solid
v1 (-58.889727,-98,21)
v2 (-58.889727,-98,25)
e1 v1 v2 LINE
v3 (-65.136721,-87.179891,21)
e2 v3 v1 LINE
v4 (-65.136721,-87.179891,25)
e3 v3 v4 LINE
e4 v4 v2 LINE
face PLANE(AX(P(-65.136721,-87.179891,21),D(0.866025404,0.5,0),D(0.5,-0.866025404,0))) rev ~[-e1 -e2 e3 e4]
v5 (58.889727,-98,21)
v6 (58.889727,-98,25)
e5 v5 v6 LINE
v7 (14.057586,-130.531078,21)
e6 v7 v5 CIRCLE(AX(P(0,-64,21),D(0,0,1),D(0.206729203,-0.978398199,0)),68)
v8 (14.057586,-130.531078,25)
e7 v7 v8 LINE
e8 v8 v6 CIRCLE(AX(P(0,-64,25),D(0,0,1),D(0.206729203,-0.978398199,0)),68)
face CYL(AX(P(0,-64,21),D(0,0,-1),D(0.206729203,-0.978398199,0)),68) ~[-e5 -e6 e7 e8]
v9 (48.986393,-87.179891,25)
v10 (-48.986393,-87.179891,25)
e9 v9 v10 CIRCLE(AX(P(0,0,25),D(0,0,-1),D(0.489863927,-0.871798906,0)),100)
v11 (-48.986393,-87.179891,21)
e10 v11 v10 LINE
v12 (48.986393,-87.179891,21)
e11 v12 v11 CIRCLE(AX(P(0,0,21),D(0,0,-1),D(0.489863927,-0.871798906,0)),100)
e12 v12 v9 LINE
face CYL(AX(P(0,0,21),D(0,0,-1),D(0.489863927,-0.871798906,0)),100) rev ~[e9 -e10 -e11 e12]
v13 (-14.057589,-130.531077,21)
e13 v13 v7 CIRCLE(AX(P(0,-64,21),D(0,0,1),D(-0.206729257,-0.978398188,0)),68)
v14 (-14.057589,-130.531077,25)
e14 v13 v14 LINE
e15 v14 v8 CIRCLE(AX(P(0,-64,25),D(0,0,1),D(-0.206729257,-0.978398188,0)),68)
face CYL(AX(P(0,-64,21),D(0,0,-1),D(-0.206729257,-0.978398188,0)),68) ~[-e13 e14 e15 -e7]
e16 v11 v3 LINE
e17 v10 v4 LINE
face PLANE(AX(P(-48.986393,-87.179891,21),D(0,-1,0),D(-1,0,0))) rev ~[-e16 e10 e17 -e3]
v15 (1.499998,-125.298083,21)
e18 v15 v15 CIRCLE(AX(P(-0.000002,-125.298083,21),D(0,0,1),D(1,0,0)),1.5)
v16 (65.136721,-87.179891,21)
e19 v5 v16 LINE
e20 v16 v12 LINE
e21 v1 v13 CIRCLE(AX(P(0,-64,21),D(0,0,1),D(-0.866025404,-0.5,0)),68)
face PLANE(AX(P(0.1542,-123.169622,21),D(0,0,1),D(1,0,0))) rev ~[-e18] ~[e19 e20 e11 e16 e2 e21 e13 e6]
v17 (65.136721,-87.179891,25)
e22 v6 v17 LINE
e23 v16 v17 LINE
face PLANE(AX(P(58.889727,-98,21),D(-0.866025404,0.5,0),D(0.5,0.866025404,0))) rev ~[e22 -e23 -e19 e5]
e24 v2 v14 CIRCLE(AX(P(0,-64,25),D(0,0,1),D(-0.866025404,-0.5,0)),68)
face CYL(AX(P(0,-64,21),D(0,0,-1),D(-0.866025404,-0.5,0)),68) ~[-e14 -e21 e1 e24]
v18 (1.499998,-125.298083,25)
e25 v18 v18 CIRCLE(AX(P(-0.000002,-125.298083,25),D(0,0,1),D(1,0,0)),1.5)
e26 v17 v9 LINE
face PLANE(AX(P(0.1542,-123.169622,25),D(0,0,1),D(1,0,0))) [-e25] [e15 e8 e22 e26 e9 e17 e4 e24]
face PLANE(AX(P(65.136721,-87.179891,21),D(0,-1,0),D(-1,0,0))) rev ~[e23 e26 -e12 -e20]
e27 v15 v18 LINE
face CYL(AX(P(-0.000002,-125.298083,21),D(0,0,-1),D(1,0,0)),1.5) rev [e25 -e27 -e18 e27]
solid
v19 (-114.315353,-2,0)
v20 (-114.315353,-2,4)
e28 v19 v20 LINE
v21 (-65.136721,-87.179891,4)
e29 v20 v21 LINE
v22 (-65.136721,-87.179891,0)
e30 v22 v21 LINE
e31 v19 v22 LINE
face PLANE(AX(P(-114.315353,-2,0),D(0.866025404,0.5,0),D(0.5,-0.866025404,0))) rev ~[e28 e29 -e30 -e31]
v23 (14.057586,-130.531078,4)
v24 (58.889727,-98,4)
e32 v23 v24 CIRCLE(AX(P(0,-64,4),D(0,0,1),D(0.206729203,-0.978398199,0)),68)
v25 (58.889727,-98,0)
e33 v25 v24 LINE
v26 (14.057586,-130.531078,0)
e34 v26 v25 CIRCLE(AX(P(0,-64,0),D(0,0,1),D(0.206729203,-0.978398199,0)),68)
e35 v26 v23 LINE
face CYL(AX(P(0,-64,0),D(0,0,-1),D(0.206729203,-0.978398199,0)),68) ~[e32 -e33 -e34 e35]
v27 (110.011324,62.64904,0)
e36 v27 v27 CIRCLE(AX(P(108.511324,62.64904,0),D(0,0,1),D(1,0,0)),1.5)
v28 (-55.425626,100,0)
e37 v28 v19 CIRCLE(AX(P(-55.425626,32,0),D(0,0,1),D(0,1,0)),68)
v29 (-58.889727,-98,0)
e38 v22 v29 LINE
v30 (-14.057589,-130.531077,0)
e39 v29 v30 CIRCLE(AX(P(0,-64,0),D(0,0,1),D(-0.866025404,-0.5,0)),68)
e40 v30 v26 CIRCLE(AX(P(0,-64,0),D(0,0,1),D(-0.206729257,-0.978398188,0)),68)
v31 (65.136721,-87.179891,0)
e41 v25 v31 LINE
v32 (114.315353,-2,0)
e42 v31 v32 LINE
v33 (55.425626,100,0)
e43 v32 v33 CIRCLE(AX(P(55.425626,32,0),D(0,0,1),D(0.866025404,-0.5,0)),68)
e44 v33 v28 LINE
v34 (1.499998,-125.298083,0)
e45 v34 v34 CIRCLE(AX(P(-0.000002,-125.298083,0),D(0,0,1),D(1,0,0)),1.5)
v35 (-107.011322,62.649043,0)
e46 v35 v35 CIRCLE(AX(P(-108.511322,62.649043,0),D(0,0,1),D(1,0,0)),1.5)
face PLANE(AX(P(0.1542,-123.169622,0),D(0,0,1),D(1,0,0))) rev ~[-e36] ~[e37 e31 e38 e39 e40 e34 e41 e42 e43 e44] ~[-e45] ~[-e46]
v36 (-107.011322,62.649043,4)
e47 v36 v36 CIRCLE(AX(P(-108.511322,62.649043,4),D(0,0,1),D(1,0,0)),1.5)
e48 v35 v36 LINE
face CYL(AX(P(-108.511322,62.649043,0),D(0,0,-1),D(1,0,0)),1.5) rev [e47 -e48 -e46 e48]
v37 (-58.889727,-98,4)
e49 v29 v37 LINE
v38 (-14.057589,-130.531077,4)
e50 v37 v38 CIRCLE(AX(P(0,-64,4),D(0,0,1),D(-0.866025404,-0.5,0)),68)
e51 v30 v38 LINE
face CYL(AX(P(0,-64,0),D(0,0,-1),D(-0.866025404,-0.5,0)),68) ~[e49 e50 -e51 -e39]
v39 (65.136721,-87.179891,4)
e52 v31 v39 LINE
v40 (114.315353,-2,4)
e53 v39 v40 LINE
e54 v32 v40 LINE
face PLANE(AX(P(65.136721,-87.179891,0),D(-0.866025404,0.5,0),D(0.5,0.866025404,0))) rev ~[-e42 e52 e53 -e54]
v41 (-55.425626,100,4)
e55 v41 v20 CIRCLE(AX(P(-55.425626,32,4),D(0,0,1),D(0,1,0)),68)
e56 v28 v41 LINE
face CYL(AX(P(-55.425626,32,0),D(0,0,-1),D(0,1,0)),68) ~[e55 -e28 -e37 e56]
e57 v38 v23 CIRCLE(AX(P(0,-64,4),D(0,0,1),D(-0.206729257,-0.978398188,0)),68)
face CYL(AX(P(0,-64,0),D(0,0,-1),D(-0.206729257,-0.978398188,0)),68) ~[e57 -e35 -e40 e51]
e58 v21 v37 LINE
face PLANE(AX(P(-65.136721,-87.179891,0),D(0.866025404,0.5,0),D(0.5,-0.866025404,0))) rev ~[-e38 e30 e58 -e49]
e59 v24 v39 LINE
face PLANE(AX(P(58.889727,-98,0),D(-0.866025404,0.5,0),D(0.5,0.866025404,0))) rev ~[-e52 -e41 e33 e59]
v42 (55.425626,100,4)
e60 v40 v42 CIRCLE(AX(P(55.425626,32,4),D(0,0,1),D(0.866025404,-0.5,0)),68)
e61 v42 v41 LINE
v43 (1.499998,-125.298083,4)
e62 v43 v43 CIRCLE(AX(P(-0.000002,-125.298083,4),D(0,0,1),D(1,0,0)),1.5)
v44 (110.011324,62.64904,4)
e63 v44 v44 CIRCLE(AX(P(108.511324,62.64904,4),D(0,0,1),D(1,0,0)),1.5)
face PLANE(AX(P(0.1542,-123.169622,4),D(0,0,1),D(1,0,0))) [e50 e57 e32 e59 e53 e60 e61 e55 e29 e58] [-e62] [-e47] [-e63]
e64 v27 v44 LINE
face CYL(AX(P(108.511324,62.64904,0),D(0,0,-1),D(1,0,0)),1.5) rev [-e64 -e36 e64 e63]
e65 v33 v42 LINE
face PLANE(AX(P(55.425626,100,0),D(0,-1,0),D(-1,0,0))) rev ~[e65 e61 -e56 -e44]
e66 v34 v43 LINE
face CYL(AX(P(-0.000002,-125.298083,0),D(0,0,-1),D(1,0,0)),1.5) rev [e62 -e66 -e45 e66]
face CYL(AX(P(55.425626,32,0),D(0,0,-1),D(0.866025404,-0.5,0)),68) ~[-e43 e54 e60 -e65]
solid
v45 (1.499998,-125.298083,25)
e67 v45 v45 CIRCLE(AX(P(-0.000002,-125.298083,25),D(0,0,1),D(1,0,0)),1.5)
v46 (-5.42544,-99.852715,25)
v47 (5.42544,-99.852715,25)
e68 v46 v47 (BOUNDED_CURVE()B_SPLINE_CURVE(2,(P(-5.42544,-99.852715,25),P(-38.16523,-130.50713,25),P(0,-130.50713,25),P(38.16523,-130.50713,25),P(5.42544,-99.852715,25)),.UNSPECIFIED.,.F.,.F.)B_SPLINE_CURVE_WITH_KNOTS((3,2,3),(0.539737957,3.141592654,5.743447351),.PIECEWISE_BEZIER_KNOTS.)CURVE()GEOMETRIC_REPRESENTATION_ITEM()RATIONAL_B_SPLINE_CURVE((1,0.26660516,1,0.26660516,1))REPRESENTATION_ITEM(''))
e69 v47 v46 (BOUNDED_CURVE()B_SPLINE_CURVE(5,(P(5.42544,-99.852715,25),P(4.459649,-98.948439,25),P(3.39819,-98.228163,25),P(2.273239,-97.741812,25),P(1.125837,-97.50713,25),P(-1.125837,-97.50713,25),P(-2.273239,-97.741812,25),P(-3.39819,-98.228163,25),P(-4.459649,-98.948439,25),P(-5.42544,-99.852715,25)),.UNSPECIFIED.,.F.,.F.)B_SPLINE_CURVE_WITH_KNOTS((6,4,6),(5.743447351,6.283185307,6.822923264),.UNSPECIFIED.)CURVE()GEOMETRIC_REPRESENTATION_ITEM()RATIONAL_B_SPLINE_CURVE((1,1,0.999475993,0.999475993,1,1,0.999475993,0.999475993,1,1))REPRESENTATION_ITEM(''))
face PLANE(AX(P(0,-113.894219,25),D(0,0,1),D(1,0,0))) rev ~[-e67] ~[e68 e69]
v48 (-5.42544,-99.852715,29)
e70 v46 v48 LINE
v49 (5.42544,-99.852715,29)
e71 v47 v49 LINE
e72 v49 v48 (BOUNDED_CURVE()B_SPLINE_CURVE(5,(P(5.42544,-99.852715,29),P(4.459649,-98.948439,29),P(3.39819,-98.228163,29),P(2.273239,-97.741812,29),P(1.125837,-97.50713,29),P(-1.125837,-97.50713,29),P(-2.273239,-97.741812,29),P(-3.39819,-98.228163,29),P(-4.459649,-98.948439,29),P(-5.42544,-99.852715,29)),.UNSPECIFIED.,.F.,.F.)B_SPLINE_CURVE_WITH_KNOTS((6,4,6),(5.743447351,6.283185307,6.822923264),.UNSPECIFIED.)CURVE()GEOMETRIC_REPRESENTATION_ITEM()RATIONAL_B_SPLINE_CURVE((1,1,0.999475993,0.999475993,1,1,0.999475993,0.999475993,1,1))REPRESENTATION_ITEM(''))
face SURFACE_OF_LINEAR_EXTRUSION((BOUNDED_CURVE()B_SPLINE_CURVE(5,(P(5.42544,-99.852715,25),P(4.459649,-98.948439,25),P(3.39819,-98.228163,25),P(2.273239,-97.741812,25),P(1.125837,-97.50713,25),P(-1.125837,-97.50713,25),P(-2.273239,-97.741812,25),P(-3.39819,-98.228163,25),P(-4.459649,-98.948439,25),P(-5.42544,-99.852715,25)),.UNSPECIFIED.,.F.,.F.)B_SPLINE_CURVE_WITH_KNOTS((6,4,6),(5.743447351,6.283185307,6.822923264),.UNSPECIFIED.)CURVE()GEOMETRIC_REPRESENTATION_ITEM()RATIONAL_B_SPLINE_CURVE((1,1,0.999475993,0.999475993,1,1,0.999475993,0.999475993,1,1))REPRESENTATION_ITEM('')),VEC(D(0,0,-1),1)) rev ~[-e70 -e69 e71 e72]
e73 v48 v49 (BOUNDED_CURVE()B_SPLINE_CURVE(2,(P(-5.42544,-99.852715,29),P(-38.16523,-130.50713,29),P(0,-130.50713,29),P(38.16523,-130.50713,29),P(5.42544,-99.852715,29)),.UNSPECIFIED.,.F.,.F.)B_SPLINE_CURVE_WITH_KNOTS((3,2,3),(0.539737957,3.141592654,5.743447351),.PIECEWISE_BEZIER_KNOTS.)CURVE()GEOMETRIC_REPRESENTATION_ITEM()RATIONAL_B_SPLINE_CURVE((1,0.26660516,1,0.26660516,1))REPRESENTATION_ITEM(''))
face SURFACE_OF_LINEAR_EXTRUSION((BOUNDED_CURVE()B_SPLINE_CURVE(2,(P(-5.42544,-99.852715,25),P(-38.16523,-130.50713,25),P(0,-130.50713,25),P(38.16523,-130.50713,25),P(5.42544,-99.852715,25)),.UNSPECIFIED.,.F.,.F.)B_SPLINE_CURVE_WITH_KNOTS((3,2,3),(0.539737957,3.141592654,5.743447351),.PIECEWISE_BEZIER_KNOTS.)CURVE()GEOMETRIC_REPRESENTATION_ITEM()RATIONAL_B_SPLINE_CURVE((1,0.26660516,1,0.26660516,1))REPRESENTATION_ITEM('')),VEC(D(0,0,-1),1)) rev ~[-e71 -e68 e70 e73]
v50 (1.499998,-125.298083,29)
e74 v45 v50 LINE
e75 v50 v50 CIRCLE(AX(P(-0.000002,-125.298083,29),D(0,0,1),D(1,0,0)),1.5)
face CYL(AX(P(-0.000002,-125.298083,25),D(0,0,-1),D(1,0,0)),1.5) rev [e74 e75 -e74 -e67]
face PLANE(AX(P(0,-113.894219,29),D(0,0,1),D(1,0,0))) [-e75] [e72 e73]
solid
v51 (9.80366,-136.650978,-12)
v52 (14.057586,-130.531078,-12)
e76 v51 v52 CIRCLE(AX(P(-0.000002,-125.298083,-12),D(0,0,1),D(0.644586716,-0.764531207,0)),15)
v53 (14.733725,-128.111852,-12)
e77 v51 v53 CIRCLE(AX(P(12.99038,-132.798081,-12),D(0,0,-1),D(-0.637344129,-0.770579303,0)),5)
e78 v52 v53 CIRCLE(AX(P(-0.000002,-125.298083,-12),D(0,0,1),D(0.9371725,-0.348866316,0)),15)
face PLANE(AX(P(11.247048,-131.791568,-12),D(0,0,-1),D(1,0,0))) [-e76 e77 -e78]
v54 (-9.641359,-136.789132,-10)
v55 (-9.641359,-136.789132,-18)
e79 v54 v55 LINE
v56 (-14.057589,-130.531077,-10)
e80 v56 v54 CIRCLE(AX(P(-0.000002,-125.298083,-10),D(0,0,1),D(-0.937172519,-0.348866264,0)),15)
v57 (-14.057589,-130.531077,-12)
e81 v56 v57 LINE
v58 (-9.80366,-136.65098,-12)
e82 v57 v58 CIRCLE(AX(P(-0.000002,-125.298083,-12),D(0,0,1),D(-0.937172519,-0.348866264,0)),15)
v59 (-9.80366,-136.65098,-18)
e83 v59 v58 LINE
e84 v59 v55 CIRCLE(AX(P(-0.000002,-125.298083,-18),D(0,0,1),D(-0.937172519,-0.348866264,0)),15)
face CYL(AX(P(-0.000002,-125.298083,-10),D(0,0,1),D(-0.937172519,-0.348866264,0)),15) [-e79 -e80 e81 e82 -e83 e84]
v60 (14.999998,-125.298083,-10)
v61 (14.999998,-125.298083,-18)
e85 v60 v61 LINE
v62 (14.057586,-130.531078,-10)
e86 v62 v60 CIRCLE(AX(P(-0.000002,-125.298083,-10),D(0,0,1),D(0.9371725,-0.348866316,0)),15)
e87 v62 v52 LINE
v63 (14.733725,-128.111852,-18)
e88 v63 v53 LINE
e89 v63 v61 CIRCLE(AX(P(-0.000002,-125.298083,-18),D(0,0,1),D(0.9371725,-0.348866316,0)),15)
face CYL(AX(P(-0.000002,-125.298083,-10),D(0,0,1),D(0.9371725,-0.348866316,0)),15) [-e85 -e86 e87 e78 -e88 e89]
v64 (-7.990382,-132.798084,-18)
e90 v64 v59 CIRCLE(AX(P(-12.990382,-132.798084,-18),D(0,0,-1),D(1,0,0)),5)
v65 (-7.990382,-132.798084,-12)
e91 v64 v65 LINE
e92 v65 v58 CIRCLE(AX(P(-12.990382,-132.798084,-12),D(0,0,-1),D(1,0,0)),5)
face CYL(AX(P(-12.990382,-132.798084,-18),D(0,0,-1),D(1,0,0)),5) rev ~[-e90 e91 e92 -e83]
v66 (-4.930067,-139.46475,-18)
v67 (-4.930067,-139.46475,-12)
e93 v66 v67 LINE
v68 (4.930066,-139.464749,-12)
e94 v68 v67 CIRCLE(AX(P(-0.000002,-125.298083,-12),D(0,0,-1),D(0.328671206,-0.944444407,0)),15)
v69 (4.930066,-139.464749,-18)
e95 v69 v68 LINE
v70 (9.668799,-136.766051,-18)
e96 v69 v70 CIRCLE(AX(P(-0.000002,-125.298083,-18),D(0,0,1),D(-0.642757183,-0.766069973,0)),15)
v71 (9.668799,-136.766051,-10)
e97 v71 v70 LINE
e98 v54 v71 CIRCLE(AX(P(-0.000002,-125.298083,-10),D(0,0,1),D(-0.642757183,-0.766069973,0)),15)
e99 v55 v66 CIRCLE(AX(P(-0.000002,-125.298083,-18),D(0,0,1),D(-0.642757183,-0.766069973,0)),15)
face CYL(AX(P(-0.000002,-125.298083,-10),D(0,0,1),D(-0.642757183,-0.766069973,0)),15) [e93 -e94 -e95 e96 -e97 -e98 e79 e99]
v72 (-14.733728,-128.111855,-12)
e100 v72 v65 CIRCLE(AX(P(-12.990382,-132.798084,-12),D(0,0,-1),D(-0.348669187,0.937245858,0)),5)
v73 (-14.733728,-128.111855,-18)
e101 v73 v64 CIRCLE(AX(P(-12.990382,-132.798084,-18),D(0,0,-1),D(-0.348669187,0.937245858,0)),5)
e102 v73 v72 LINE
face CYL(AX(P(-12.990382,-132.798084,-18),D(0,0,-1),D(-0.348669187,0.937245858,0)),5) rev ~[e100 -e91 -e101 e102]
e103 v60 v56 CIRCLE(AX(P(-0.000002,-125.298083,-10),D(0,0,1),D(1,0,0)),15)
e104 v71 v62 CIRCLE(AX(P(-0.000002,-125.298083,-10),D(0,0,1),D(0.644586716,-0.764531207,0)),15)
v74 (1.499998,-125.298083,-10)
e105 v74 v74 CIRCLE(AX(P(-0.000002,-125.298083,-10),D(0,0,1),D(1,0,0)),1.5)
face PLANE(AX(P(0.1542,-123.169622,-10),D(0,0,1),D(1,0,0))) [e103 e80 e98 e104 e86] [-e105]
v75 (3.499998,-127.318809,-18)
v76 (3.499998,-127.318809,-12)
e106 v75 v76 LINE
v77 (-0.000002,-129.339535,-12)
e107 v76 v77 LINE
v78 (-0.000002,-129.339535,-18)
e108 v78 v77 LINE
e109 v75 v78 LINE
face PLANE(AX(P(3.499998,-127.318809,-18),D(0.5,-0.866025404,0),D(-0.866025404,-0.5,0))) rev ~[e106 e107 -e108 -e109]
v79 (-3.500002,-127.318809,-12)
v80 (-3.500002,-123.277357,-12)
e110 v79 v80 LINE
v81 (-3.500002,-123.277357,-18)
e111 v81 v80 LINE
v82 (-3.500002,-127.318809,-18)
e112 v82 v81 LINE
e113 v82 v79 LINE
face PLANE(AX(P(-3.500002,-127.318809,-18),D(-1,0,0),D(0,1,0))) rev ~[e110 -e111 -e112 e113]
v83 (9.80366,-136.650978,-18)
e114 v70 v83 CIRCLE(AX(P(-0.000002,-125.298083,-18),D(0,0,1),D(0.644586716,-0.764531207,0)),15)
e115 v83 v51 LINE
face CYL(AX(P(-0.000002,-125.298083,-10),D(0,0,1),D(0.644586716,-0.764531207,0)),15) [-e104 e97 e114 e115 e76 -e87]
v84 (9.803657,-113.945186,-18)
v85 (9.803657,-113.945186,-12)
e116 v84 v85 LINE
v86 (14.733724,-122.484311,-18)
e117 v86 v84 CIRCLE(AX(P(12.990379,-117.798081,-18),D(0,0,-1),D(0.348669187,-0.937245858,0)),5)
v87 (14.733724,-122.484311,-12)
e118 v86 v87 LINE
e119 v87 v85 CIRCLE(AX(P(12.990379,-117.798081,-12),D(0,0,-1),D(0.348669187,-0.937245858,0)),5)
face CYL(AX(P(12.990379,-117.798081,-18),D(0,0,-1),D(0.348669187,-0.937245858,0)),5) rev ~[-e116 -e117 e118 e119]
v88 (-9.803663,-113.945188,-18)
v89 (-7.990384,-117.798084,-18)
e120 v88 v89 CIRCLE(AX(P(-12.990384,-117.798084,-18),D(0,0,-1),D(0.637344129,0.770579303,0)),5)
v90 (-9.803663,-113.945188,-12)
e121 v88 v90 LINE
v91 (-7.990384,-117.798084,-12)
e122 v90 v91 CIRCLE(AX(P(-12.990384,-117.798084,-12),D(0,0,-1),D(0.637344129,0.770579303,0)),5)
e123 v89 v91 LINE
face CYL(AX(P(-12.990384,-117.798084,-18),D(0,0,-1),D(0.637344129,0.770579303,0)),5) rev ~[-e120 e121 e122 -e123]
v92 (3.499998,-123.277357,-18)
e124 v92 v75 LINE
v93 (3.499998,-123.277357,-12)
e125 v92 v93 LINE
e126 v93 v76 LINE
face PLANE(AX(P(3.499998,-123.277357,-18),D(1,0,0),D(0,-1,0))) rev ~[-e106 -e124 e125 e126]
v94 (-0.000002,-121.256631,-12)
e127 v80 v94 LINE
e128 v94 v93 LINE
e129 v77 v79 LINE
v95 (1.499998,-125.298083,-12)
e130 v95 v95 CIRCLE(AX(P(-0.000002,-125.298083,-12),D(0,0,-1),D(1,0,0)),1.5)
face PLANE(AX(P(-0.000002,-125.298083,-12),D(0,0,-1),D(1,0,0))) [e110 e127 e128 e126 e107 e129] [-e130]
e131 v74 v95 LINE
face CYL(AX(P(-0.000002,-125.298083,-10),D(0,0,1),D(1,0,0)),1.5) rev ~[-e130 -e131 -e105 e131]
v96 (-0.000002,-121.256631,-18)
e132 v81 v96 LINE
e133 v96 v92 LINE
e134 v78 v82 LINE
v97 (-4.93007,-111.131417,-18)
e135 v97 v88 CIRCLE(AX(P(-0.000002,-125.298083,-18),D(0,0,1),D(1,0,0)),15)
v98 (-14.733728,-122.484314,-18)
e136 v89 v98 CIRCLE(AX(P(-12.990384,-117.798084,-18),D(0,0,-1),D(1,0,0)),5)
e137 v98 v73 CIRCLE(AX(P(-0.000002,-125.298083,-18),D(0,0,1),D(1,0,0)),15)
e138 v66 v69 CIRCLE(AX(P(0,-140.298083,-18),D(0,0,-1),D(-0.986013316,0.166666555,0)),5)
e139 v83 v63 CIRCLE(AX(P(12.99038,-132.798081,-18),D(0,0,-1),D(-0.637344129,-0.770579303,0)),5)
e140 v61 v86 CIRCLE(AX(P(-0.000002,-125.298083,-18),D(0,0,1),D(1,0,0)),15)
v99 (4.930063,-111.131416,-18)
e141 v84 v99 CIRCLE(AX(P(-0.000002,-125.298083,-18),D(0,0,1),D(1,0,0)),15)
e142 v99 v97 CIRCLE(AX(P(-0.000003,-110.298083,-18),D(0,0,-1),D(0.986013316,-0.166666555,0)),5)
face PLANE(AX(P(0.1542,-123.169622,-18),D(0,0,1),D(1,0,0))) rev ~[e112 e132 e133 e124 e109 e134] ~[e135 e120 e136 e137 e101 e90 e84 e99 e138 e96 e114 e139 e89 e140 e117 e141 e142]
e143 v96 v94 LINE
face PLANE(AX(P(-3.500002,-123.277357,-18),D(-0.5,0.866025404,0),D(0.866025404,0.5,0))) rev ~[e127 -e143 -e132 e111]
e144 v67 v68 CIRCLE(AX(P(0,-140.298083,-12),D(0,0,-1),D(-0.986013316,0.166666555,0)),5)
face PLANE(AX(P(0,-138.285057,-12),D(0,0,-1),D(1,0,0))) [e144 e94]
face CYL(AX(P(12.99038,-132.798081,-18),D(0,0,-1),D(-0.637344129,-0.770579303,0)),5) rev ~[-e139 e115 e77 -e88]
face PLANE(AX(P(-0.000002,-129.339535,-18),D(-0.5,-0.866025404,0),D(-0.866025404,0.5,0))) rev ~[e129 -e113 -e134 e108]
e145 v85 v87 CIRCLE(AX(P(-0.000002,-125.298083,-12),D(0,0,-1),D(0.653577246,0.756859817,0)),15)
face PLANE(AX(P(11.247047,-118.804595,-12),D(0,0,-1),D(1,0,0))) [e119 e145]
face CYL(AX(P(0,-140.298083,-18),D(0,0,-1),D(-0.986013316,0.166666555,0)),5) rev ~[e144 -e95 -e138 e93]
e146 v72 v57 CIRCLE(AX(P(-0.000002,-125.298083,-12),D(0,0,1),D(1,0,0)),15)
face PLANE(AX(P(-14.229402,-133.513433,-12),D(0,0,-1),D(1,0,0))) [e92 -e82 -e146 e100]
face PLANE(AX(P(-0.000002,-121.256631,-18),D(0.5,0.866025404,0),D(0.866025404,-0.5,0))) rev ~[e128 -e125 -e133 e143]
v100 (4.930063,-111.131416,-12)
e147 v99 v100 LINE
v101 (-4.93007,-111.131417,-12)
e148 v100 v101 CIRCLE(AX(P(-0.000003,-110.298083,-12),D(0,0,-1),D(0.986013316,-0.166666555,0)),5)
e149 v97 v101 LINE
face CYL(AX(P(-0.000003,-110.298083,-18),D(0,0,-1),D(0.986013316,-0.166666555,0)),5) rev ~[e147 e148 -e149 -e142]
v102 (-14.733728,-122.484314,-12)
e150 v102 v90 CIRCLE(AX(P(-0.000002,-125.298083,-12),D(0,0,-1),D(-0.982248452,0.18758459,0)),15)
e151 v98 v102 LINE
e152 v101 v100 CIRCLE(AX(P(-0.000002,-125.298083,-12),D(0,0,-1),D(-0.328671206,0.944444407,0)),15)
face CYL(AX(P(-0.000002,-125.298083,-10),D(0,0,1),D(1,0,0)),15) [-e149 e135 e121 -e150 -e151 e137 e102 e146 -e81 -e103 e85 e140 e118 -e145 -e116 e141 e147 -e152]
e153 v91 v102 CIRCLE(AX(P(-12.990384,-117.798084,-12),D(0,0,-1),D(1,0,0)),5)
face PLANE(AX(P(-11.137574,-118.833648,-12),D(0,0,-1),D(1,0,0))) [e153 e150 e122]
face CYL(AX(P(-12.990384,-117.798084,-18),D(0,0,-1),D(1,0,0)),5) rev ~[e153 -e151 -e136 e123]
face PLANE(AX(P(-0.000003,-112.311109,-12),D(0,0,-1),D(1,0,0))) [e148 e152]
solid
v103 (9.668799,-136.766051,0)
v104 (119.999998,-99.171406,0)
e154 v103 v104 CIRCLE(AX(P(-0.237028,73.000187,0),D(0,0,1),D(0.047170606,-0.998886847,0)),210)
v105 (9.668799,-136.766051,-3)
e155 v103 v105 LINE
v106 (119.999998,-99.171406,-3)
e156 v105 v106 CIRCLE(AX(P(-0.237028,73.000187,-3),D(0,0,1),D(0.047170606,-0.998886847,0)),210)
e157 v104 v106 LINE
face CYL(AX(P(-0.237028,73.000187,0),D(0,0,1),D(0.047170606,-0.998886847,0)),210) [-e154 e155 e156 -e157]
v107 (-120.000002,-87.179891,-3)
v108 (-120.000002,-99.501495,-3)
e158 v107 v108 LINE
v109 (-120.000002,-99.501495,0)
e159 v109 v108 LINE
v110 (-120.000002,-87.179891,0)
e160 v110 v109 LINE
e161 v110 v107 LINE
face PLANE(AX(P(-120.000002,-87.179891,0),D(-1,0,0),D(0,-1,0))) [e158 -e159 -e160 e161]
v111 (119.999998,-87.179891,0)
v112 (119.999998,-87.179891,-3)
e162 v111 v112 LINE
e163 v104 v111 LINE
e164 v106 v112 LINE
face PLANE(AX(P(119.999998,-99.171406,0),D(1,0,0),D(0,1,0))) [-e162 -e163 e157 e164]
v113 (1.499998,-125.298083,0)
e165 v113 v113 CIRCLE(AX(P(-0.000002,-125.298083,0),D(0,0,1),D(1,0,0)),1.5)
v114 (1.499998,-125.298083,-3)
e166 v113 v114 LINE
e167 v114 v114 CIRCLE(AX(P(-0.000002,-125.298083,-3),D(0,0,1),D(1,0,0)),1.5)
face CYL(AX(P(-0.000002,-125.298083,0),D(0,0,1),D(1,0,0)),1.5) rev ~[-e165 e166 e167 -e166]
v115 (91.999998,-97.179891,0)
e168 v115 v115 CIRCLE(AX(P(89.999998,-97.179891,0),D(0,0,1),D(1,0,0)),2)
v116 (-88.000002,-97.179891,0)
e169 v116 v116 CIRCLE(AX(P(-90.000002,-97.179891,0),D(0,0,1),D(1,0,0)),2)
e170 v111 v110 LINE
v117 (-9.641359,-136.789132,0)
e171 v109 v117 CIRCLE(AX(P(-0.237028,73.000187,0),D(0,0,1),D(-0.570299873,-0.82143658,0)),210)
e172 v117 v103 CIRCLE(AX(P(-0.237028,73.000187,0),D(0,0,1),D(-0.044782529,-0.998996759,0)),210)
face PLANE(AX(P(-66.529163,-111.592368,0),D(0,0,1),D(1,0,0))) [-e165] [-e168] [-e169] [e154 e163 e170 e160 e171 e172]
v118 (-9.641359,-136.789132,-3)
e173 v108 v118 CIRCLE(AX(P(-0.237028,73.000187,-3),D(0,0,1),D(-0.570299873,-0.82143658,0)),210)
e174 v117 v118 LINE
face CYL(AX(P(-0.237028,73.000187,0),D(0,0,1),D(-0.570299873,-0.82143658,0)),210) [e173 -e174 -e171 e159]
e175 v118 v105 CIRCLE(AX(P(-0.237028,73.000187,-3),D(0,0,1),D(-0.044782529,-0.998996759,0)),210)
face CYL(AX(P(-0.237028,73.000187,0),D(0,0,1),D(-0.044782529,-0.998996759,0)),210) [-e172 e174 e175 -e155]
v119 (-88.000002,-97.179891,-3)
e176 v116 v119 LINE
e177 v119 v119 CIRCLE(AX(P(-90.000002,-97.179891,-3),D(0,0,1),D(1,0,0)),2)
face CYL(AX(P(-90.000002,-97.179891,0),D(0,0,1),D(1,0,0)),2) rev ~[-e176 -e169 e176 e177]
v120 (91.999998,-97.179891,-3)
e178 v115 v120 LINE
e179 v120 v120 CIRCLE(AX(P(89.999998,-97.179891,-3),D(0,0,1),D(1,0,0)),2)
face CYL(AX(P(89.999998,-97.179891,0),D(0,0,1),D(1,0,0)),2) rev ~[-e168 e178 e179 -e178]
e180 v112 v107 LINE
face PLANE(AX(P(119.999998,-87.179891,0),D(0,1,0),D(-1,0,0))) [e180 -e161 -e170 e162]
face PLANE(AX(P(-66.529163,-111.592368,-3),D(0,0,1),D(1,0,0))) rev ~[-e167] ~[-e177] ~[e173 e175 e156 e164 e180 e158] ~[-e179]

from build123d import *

# Parameters (mm, degrees)
F0_R     = 1.5
F1_DEPTH = 4
F0_R_2   = 2
F2_DEPTH = 3
F3_START = -10
F3_DEPTH = 8
F4_R     = 1.5
F5_DEPTH = 6
F6_START = 21
F6_DEPTH = 4
F7_R     = 1.5
F8_DEPTH = 4


with BuildPart() as f1:
    # F0 (on Top) → F1 (new body)
    with BuildSketch(Plane.XY):
        with BuildLine():
            ThreePointArc((14.9999983029, -125.2980828285), (-2.6585899749, -110.535565822), (-14.0575894796, -130.5310767839))
            ThreePointArc((-14.0575894796, -130.5310767839), (-1.8826e-06, -132), (14.0575857957, -130.5310775623))
            ThreePointArc((14.0575857957, -130.5310775623), (14.7625152359, -127.9566715151), (14.9999983029, -125.2980828285))
        make_face()
        with Locations((-1.6971e-06, -125.2980828285)):
            Circle(F0_R, mode=Mode.SUBTRACT)
        with BuildLine():
            Line((-48.9863926684, -87.1798906476), (-65.1367205046, -87.1798906476))
            Line((-65.1367205046, -87.1798906476), (-58.8897274573, -98))
            ThreePointArc((-58.8897274573, -98), (-39.9361427939, -119.0373009762), (-14.0575894796, -130.5310767839))
            ThreePointArc((-14.0575894796, -130.5310767839), (-2.6585899749, -110.535565822), (14.9999983029, -125.2980828285))
            ThreePointArc((14.9999983029, -125.2980828285), (14.7625152359, -127.9566715151), (14.0575857957, -130.5310775623))
            ThreePointArc((14.0575857957, -130.5310775623), (39.9361412701, -119.0373020819), (58.8897274573, -98))
            Line((58.8897274573, -98), (65.1367205046, -87.1798906476))
            Line((65.1367205046, -87.1798906476), (48.9863926684, -87.1798906476))
            ThreePointArc((48.9863926684, -87.1798906476), (0, -100), (-48.9863926684, -87.1798906476))
        make_face()
        with BuildLine():
            Line((-114.3153532995, -2), (-86.6025397374, -50.0000011103))
            ThreePointArc((-86.6025397374, -50.0000011103), (-86.6025407137, 49.9999994193), (-5.89e-08, 100))
            Line((-5.89e-08, 100), (-55.4256258422, 100))
            ThreePointArc((-55.4256258422, 100), (-114.3153532995, 66), (-114.3153532995, -2))
        make_face()
        with Locations((-108.5113219264, 62.649042884)):
            Circle(F0_R, mode=Mode.SUBTRACT)
        with BuildLine():
            Line((55.4256258422, 100), (-5.89e-08, 100))
            ThreePointArc((-5.89e-08, 100), (70.7106780978, 70.7106781395), (100, 0))
            ThreePointArc((100, 0), (96.5925823782, -25.881905446), (86.6025394097, -50.0000016779))
            Line((86.6025394097, -50.0000016779), (114.3153532995, -2))
            ThreePointArc((114.3153532995, -2), (114.3153532995, 66), (55.4256258422, 100))
        make_face()
        with Locations((108.5113236235, 62.6490399445)):
            Circle(F0_R, mode=Mode.SUBTRACT)
        with BuildLine():
            Line((-86.6025397374, -50.0000011103), (-65.1367205046, -87.1798906476))
            Line((-65.1367205046, -87.1798906476), (-48.9863926684, -87.1798906476))
            ThreePointArc((-48.9863926684, -87.1798906476), (-70.2970532401, -71.1218975124), (-86.6025397374, -50.0000011103))
        make_face()
        with BuildLine():
            ThreePointArc((-86.6025397374, -50.0000011103), (-70.2970532401, -71.1218975124), (-48.9863926684, -87.1798906476))
            Line((-48.9863926684, -87.1798906476), (48.9863926684, -87.1798906476))
            ThreePointArc((48.9863926684, -87.1798906476), (70.2970530071, -71.1218977427), (86.6025394097, -50.0000016779))
            ThreePointArc((86.6025394097, -50.0000016779), (96.5925823782, -25.881905446), (100, 0))
            ThreePointArc((100, 0), (70.7106780978, 70.7106781395), (-5.89e-08, 100))
            ThreePointArc((-5.89e-08, 100), (-86.6025407137, 49.9999994193), (-86.6025397374, -50.0000011103))
        make_face()
        with BuildLine():
            Line((48.9863926684, -87.1798906476), (-48.9863926684, -87.1798906476))
            ThreePointArc((-48.9863926684, -87.1798906476), (0, -100), (48.9863926684, -87.1798906476))
        make_face()
        with BuildLine():
            ThreePointArc((86.6025394097, -50.0000016779), (70.2970530071, -71.1218977427), (48.9863926684, -87.1798906476))
            Line((48.9863926684, -87.1798906476), (65.1367205046, -87.1798906476))
            Line((65.1367205046, -87.1798906476), (86.6025394097, -50.0000016779))
        make_face()
    extrude(amount=F1_DEPTH)


with BuildPart() as f2:
    # F0 (on Top) → F2 (new body)
    with BuildSketch(Plane.XY):
        with BuildLine():
            Line((-65.1367205046, -87.1798906476), (-120.0000016971, -87.1798906476))
            Line((-120.0000016971, -87.1798906476), (-120.0000016971, -99.5014946908))
            ThreePointArc((-120.0000016971, -99.5014946908), (-67.4578593153, -125.9504598013), (-9.6413594448, -136.7891324229))
            ThreePointArc((-9.6413594448, -136.7891324229), (-12.2556461072, -133.946734752), (-14.0575894796, -130.5310767839))
            ThreePointArc((-14.0575894796, -130.5310767839), (-39.9361427939, -119.0373009762), (-58.8897274573, -98))
            Line((-58.8897274573, -98), (-65.1367205046, -87.1798906476))
        make_face()
        with Locations((-90.0000016971, -97.1798906476)):
            Circle(F0_R_2, mode=Mode.SUBTRACT)
        with BuildLine():
            Line((-48.9863926684, -87.1798906476), (-65.1367205046, -87.1798906476))
            Line((-65.1367205046, -87.1798906476), (-58.8897274573, -98))
            ThreePointArc((-58.8897274573, -98), (-39.9361427939, -119.0373009762), (-14.0575894796, -130.5310767839))
            ThreePointArc((-14.0575894796, -130.5310767839), (-2.6585899749, -110.535565822), (14.9999983029, -125.2980828285))
            ThreePointArc((14.9999983029, -125.2980828285), (14.7625152359, -127.9566715151), (14.0575857957, -130.5310775623))
            ThreePointArc((14.0575857957, -130.5310775623), (39.9361412701, -119.0373020819), (58.8897274573, -98))
            Line((58.8897274573, -98), (65.1367205046, -87.1798906476))
            Line((65.1367205046, -87.1798906476), (48.9863926684, -87.1798906476))
            ThreePointArc((48.9863926684, -87.1798906476), (0, -100), (-48.9863926684, -87.1798906476))
        make_face()
        with BuildLine():
            ThreePointArc((14.9999983029, -125.2980828285), (-2.6585899749, -110.535565822), (-14.0575894796, -130.5310767839))
            ThreePointArc((-14.0575894796, -130.5310767839), (-1.8826e-06, -132), (14.0575857957, -130.5310775623))
            ThreePointArc((14.0575857957, -130.5310775623), (14.7625152359, -127.9566715151), (14.9999983029, -125.2980828285))
        make_face()
        with Locations((-1.6971e-06, -125.2980828285)):
            Circle(F0_R, mode=Mode.SUBTRACT)
        with BuildLine():
            ThreePointArc((14.0575857957, -130.5310775623), (12.2659714734, -133.9320797119), (9.6687990395, -136.7660509273))
            ThreePointArc((9.6687990395, -136.7660509273), (67.4950168504, -125.7769999545), (119.9999983029, -99.1714059888))
            Line((119.9999983029, -99.1714059888), (119.9999983029, -87.1798906476))
            Line((119.9999983029, -87.1798906476), (65.1367205046, -87.1798906476))
            Line((65.1367205046, -87.1798906476), (58.8897274573, -98))
            ThreePointArc((58.8897274573, -98), (39.9361412701, -119.0373020819), (14.0575857957, -130.5310775623))
        make_face()
        with Locations((89.9999983029, -97.1798906476)):
            Circle(F0_R_2, mode=Mode.SUBTRACT)
        with BuildLine():
            Line((48.9863926684, -87.1798906476), (-48.9863926684, -87.1798906476))
            ThreePointArc((-48.9863926684, -87.1798906476), (0, -100), (48.9863926684, -87.1798906476))
        make_face()
        with BuildLine():
            ThreePointArc((-14.0575894796, -130.5310767839), (-12.2556461072, -133.946734752), (-9.6413594448, -136.7891324229))
            ThreePointArc((-9.6413594448, -136.7891324229), (0.0139852399, -136.9996629548), (9.6687990395, -136.7660509273))
            ThreePointArc((9.6687990395, -136.7660509273), (12.2659714734, -133.9320797119), (14.0575857957, -130.5310775623))
            ThreePointArc((14.0575857957, -130.5310775623), (-1.8826e-06, -132), (-14.0575894796, -130.5310767839))
        make_face()
    extrude(amount=-F2_DEPTH)


with BuildPart() as f3:
    # F0 (on Top) → F3 (new body)
    with BuildSketch(Plane.XY.offset(F3_START)):
        with BuildLine():
            ThreePointArc((14.9999983029, -125.2980828285), (-2.6585899749, -110.535565822), (-14.0575894796, -130.5310767839))
            ThreePointArc((-14.0575894796, -130.5310767839), (-1.8826e-06, -132), (14.0575857957, -130.5310775623))
            ThreePointArc((14.0575857957, -130.5310775623), (14.7625152359, -127.9566715151), (14.9999983029, -125.2980828285))
        make_face()
        with Locations((-1.6971e-06, -125.2980828285)):
            Circle(F0_R, mode=Mode.SUBTRACT)
        with BuildLine():
            ThreePointArc((-14.0575894796, -130.5310767839), (-12.2556461072, -133.946734752), (-9.6413594448, -136.7891324229))
            ThreePointArc((-9.6413594448, -136.7891324229), (0.0139852399, -136.9996629548), (9.6687990395, -136.7660509273))
            ThreePointArc((9.6687990395, -136.7660509273), (12.2659714734, -133.9320797119), (14.0575857957, -130.5310775623))
            ThreePointArc((14.0575857957, -130.5310775623), (-1.8826e-06, -132), (-14.0575894796, -130.5310767839))
        make_face()
        with BuildLine():
            ThreePointArc((9.6687990395, -136.7660509273), (0.0139852399, -136.9996629548), (-9.6413594448, -136.7891324229))
            ThreePointArc((-9.6413594448, -136.7891324229), (0.0179278392, -140.2980721129), (9.6687990395, -136.7660509273))
        make_face()
    extrude(amount=-F3_DEPTH)

    # F4 (on face) → F5 (cut)
    with BuildSketch(Plane(origin=(0, 0, -18), x_dir=(1, 0, 0), z_dir=(0, 0, -1))):
        with BuildLine():
            ThreePointArc((4.9300663916, 139.4647489374), (0, 140.2980828285), (-4.9300665802, 139.464750053))
            ThreePointArc((-4.9300665802, 139.464750053), (-5.657e-07, 135.2980828285), (4.9300663916, 139.4647489374))
        make_face()
        with BuildLine():
            ThreePointArc((-14.733727842, 128.1118550097), (-12.9903819053, 132.7980842982), (-9.80366039, 136.6509800902))
            ThreePointArc((-9.80366039, 136.6509800902), (-17.3205086414, 135.2980847882), (-14.733727842, 128.1118550097))
        make_face()
        with BuildLine():
            ThreePointArc((-7.9903819053, 132.7980842982), (-8.4663567298, 134.9272146868), (-9.80366039, 136.6509800902))
            ThreePointArc((-9.80366039, 136.6509800902), (-12.9903819053, 132.7980842982), (-14.733727842, 128.1118550097))
            ThreePointArc((-14.733727842, 128.1118550097), (-10.1370268348, 128.6921903832), (-7.9903819053, 132.7980842982))
        make_face()
        with BuildLine():
            ThreePointArc((14.7337250845, 128.1118516757), (12.9903802082, 132.7980813588), (9.8036595647, 136.6509778718))
            ThreePointArc((9.8036595647, 136.6509778718), (8.6602529064, 130.2980818487), (14.7337250845, 128.1118516757))
        make_face()
        with BuildLine():
            ThreePointArc((17.9903802082, 132.7980813588), (15.1195111087, 137.3221062934), (9.8036595647, 136.6509778718))
            ThreePointArc((9.8036595647, 136.6509778718), (12.9903802082, 132.7980813588), (14.7337250845, 128.1118516757))
            ThreePointArc((14.7337250845, 128.1118516757), (17.0962738004, 129.9447258238), (17.9903802082, 132.7980813588))
        make_face()
        with BuildLine():
            ThreePointArc((-7.9903836024, 117.7980842982), (-10.1370280674, 121.9039778905), (-14.7337284787, 122.4843139813))
            ThreePointArc((-14.7337284787, 122.4843139813), (-12.9903836024, 117.7980842982), (-9.8036629589, 113.9451877852))
            ThreePointArc((-9.8036629589, 113.9451877852), (-8.4663586678, 115.6689533978), (-7.9903836024, 117.7980842982))
        make_face()
        with BuildLine():
            ThreePointArc((9.8036569958, 113.9451855669), (12.9903785111, 117.7980813588), (14.7337244478, 122.4843106474))
            ThreePointArc((14.7337244478, 122.4843106474), (8.6602517751, 120.2980818487), (9.8036569958, 113.9451855669))
        make_face()
        with BuildLine():
            ThreePointArc((4.930063186, 111.1314156041), (-2.8285e-06, 115.2980828285), (-4.9300697858, 111.1314167196))
            ThreePointArc((-4.9300697858, 111.1314167196), (-3.3942e-06, 110.2980828285), (4.930063186, 111.1314156041))
        make_face()
        Polygon((3.4999983029, 123.2773568864), (3.4999983029, 127.3188087707), (-1.6971e-06, 129.3395347128), (-3.5000016971, 127.3188087707), (-3.5000016971, 123.2773568864), (-1.6971e-06, 121.2566309442), align=None)
        with Locations((-1.6971e-06, 125.2980828285)):
            Circle(F4_R, mode=Mode.SUBTRACT)
    extrude(amount=-F5_DEPTH, mode=Mode.SUBTRACT)


with BuildPart() as f6:
    # F0 (on Top) → F6 (new body)
    with BuildSketch(Plane.XY.offset(F6_START)):
        with BuildLine():
            ThreePointArc((14.9999983029, -125.2980828285), (-2.6585899749, -110.535565822), (-14.0575894796, -130.5310767839))
            ThreePointArc((-14.0575894796, -130.5310767839), (-1.8826e-06, -132), (14.0575857957, -130.5310775623))
            ThreePointArc((14.0575857957, -130.5310775623), (14.7625152359, -127.9566715151), (14.9999983029, -125.2980828285))
        make_face()
        with Locations((-1.6971e-06, -125.2980828285)):
            Circle(F0_R, mode=Mode.SUBTRACT)
        with BuildLine():
            Line((-48.9863926684, -87.1798906476), (-65.1367205046, -87.1798906476))
            Line((-65.1367205046, -87.1798906476), (-58.8897274573, -98))
            ThreePointArc((-58.8897274573, -98), (-39.9361427939, -119.0373009762), (-14.0575894796, -130.5310767839))
            ThreePointArc((-14.0575894796, -130.5310767839), (-2.6585899749, -110.535565822), (14.9999983029, -125.2980828285))
            ThreePointArc((14.9999983029, -125.2980828285), (14.7625152359, -127.9566715151), (14.0575857957, -130.5310775623))
            ThreePointArc((14.0575857957, -130.5310775623), (39.9361412701, -119.0373020819), (58.8897274573, -98))
            Line((58.8897274573, -98), (65.1367205046, -87.1798906476))
            Line((65.1367205046, -87.1798906476), (48.9863926684, -87.1798906476))
            ThreePointArc((48.9863926684, -87.1798906476), (0, -100), (-48.9863926684, -87.1798906476))
        make_face()
    extrude(amount=F6_DEPTH)


with BuildPart() as f8:
    # F7 (on face) → F8 (new body)
    with BuildSketch(Plane.XY.offset(25)):
        with BuildLine():
            ThreePointArc((5.4254401673, -99.8527145299), (0, -100), (-5.4254401673, -99.8527145299))
            add(Edge.make_bspline(
                [(-5.4254401673, -99.8527145299), (-38.1652299211, -130.5071302652), (0, -130.5071302652), (38.1652299211, -130.5071302652), (5.4254401673, -99.8527145299)],
                knots=[0.5397379565, 0.5397379565, 0.5397379565, 3.1415926536, 3.1415926536, 5.7434473507, 5.7434473507, 5.7434473507], degree=2, weights=[1, 0.2666051595, 1, 0.2666051595, 1]))
        make_face()
        with Locations((-1.6971e-06, -125.2980828285)):
            Circle(F7_R, mode=Mode.SUBTRACT)
        with BuildLine():
            add(Edge.make_bspline(
                [(5.4254401673, -99.8527145299), (2.920289316, -97.5071302652), (0, -97.5071302652)],
                knots=[5.7434473507, 5.7434473507, 5.7434473507, 6.2831853072, 6.2831853072, 6.2831853072], degree=2, weights=[1, 0.9638058357, 1]))
            add(Edge.make_bspline(
                [(0, -97.5071302652), (-2.920289316, -97.5071302652), (-5.4254401673, -99.8527145299)],
                knots=[0, 0, 0, 0.5397379565, 0.5397379565, 0.5397379565], degree=2, weights=[1, 0.9638058357, 1]))
            ThreePointArc((-5.4254401673, -99.8527145299), (0, -100), (5.4254401673, -99.8527145299))
        make_face()
    extrude(amount=F8_DEPTH)


solid = Compound([f1.part, f2.part, f3.part, f6.part, f8.part])
